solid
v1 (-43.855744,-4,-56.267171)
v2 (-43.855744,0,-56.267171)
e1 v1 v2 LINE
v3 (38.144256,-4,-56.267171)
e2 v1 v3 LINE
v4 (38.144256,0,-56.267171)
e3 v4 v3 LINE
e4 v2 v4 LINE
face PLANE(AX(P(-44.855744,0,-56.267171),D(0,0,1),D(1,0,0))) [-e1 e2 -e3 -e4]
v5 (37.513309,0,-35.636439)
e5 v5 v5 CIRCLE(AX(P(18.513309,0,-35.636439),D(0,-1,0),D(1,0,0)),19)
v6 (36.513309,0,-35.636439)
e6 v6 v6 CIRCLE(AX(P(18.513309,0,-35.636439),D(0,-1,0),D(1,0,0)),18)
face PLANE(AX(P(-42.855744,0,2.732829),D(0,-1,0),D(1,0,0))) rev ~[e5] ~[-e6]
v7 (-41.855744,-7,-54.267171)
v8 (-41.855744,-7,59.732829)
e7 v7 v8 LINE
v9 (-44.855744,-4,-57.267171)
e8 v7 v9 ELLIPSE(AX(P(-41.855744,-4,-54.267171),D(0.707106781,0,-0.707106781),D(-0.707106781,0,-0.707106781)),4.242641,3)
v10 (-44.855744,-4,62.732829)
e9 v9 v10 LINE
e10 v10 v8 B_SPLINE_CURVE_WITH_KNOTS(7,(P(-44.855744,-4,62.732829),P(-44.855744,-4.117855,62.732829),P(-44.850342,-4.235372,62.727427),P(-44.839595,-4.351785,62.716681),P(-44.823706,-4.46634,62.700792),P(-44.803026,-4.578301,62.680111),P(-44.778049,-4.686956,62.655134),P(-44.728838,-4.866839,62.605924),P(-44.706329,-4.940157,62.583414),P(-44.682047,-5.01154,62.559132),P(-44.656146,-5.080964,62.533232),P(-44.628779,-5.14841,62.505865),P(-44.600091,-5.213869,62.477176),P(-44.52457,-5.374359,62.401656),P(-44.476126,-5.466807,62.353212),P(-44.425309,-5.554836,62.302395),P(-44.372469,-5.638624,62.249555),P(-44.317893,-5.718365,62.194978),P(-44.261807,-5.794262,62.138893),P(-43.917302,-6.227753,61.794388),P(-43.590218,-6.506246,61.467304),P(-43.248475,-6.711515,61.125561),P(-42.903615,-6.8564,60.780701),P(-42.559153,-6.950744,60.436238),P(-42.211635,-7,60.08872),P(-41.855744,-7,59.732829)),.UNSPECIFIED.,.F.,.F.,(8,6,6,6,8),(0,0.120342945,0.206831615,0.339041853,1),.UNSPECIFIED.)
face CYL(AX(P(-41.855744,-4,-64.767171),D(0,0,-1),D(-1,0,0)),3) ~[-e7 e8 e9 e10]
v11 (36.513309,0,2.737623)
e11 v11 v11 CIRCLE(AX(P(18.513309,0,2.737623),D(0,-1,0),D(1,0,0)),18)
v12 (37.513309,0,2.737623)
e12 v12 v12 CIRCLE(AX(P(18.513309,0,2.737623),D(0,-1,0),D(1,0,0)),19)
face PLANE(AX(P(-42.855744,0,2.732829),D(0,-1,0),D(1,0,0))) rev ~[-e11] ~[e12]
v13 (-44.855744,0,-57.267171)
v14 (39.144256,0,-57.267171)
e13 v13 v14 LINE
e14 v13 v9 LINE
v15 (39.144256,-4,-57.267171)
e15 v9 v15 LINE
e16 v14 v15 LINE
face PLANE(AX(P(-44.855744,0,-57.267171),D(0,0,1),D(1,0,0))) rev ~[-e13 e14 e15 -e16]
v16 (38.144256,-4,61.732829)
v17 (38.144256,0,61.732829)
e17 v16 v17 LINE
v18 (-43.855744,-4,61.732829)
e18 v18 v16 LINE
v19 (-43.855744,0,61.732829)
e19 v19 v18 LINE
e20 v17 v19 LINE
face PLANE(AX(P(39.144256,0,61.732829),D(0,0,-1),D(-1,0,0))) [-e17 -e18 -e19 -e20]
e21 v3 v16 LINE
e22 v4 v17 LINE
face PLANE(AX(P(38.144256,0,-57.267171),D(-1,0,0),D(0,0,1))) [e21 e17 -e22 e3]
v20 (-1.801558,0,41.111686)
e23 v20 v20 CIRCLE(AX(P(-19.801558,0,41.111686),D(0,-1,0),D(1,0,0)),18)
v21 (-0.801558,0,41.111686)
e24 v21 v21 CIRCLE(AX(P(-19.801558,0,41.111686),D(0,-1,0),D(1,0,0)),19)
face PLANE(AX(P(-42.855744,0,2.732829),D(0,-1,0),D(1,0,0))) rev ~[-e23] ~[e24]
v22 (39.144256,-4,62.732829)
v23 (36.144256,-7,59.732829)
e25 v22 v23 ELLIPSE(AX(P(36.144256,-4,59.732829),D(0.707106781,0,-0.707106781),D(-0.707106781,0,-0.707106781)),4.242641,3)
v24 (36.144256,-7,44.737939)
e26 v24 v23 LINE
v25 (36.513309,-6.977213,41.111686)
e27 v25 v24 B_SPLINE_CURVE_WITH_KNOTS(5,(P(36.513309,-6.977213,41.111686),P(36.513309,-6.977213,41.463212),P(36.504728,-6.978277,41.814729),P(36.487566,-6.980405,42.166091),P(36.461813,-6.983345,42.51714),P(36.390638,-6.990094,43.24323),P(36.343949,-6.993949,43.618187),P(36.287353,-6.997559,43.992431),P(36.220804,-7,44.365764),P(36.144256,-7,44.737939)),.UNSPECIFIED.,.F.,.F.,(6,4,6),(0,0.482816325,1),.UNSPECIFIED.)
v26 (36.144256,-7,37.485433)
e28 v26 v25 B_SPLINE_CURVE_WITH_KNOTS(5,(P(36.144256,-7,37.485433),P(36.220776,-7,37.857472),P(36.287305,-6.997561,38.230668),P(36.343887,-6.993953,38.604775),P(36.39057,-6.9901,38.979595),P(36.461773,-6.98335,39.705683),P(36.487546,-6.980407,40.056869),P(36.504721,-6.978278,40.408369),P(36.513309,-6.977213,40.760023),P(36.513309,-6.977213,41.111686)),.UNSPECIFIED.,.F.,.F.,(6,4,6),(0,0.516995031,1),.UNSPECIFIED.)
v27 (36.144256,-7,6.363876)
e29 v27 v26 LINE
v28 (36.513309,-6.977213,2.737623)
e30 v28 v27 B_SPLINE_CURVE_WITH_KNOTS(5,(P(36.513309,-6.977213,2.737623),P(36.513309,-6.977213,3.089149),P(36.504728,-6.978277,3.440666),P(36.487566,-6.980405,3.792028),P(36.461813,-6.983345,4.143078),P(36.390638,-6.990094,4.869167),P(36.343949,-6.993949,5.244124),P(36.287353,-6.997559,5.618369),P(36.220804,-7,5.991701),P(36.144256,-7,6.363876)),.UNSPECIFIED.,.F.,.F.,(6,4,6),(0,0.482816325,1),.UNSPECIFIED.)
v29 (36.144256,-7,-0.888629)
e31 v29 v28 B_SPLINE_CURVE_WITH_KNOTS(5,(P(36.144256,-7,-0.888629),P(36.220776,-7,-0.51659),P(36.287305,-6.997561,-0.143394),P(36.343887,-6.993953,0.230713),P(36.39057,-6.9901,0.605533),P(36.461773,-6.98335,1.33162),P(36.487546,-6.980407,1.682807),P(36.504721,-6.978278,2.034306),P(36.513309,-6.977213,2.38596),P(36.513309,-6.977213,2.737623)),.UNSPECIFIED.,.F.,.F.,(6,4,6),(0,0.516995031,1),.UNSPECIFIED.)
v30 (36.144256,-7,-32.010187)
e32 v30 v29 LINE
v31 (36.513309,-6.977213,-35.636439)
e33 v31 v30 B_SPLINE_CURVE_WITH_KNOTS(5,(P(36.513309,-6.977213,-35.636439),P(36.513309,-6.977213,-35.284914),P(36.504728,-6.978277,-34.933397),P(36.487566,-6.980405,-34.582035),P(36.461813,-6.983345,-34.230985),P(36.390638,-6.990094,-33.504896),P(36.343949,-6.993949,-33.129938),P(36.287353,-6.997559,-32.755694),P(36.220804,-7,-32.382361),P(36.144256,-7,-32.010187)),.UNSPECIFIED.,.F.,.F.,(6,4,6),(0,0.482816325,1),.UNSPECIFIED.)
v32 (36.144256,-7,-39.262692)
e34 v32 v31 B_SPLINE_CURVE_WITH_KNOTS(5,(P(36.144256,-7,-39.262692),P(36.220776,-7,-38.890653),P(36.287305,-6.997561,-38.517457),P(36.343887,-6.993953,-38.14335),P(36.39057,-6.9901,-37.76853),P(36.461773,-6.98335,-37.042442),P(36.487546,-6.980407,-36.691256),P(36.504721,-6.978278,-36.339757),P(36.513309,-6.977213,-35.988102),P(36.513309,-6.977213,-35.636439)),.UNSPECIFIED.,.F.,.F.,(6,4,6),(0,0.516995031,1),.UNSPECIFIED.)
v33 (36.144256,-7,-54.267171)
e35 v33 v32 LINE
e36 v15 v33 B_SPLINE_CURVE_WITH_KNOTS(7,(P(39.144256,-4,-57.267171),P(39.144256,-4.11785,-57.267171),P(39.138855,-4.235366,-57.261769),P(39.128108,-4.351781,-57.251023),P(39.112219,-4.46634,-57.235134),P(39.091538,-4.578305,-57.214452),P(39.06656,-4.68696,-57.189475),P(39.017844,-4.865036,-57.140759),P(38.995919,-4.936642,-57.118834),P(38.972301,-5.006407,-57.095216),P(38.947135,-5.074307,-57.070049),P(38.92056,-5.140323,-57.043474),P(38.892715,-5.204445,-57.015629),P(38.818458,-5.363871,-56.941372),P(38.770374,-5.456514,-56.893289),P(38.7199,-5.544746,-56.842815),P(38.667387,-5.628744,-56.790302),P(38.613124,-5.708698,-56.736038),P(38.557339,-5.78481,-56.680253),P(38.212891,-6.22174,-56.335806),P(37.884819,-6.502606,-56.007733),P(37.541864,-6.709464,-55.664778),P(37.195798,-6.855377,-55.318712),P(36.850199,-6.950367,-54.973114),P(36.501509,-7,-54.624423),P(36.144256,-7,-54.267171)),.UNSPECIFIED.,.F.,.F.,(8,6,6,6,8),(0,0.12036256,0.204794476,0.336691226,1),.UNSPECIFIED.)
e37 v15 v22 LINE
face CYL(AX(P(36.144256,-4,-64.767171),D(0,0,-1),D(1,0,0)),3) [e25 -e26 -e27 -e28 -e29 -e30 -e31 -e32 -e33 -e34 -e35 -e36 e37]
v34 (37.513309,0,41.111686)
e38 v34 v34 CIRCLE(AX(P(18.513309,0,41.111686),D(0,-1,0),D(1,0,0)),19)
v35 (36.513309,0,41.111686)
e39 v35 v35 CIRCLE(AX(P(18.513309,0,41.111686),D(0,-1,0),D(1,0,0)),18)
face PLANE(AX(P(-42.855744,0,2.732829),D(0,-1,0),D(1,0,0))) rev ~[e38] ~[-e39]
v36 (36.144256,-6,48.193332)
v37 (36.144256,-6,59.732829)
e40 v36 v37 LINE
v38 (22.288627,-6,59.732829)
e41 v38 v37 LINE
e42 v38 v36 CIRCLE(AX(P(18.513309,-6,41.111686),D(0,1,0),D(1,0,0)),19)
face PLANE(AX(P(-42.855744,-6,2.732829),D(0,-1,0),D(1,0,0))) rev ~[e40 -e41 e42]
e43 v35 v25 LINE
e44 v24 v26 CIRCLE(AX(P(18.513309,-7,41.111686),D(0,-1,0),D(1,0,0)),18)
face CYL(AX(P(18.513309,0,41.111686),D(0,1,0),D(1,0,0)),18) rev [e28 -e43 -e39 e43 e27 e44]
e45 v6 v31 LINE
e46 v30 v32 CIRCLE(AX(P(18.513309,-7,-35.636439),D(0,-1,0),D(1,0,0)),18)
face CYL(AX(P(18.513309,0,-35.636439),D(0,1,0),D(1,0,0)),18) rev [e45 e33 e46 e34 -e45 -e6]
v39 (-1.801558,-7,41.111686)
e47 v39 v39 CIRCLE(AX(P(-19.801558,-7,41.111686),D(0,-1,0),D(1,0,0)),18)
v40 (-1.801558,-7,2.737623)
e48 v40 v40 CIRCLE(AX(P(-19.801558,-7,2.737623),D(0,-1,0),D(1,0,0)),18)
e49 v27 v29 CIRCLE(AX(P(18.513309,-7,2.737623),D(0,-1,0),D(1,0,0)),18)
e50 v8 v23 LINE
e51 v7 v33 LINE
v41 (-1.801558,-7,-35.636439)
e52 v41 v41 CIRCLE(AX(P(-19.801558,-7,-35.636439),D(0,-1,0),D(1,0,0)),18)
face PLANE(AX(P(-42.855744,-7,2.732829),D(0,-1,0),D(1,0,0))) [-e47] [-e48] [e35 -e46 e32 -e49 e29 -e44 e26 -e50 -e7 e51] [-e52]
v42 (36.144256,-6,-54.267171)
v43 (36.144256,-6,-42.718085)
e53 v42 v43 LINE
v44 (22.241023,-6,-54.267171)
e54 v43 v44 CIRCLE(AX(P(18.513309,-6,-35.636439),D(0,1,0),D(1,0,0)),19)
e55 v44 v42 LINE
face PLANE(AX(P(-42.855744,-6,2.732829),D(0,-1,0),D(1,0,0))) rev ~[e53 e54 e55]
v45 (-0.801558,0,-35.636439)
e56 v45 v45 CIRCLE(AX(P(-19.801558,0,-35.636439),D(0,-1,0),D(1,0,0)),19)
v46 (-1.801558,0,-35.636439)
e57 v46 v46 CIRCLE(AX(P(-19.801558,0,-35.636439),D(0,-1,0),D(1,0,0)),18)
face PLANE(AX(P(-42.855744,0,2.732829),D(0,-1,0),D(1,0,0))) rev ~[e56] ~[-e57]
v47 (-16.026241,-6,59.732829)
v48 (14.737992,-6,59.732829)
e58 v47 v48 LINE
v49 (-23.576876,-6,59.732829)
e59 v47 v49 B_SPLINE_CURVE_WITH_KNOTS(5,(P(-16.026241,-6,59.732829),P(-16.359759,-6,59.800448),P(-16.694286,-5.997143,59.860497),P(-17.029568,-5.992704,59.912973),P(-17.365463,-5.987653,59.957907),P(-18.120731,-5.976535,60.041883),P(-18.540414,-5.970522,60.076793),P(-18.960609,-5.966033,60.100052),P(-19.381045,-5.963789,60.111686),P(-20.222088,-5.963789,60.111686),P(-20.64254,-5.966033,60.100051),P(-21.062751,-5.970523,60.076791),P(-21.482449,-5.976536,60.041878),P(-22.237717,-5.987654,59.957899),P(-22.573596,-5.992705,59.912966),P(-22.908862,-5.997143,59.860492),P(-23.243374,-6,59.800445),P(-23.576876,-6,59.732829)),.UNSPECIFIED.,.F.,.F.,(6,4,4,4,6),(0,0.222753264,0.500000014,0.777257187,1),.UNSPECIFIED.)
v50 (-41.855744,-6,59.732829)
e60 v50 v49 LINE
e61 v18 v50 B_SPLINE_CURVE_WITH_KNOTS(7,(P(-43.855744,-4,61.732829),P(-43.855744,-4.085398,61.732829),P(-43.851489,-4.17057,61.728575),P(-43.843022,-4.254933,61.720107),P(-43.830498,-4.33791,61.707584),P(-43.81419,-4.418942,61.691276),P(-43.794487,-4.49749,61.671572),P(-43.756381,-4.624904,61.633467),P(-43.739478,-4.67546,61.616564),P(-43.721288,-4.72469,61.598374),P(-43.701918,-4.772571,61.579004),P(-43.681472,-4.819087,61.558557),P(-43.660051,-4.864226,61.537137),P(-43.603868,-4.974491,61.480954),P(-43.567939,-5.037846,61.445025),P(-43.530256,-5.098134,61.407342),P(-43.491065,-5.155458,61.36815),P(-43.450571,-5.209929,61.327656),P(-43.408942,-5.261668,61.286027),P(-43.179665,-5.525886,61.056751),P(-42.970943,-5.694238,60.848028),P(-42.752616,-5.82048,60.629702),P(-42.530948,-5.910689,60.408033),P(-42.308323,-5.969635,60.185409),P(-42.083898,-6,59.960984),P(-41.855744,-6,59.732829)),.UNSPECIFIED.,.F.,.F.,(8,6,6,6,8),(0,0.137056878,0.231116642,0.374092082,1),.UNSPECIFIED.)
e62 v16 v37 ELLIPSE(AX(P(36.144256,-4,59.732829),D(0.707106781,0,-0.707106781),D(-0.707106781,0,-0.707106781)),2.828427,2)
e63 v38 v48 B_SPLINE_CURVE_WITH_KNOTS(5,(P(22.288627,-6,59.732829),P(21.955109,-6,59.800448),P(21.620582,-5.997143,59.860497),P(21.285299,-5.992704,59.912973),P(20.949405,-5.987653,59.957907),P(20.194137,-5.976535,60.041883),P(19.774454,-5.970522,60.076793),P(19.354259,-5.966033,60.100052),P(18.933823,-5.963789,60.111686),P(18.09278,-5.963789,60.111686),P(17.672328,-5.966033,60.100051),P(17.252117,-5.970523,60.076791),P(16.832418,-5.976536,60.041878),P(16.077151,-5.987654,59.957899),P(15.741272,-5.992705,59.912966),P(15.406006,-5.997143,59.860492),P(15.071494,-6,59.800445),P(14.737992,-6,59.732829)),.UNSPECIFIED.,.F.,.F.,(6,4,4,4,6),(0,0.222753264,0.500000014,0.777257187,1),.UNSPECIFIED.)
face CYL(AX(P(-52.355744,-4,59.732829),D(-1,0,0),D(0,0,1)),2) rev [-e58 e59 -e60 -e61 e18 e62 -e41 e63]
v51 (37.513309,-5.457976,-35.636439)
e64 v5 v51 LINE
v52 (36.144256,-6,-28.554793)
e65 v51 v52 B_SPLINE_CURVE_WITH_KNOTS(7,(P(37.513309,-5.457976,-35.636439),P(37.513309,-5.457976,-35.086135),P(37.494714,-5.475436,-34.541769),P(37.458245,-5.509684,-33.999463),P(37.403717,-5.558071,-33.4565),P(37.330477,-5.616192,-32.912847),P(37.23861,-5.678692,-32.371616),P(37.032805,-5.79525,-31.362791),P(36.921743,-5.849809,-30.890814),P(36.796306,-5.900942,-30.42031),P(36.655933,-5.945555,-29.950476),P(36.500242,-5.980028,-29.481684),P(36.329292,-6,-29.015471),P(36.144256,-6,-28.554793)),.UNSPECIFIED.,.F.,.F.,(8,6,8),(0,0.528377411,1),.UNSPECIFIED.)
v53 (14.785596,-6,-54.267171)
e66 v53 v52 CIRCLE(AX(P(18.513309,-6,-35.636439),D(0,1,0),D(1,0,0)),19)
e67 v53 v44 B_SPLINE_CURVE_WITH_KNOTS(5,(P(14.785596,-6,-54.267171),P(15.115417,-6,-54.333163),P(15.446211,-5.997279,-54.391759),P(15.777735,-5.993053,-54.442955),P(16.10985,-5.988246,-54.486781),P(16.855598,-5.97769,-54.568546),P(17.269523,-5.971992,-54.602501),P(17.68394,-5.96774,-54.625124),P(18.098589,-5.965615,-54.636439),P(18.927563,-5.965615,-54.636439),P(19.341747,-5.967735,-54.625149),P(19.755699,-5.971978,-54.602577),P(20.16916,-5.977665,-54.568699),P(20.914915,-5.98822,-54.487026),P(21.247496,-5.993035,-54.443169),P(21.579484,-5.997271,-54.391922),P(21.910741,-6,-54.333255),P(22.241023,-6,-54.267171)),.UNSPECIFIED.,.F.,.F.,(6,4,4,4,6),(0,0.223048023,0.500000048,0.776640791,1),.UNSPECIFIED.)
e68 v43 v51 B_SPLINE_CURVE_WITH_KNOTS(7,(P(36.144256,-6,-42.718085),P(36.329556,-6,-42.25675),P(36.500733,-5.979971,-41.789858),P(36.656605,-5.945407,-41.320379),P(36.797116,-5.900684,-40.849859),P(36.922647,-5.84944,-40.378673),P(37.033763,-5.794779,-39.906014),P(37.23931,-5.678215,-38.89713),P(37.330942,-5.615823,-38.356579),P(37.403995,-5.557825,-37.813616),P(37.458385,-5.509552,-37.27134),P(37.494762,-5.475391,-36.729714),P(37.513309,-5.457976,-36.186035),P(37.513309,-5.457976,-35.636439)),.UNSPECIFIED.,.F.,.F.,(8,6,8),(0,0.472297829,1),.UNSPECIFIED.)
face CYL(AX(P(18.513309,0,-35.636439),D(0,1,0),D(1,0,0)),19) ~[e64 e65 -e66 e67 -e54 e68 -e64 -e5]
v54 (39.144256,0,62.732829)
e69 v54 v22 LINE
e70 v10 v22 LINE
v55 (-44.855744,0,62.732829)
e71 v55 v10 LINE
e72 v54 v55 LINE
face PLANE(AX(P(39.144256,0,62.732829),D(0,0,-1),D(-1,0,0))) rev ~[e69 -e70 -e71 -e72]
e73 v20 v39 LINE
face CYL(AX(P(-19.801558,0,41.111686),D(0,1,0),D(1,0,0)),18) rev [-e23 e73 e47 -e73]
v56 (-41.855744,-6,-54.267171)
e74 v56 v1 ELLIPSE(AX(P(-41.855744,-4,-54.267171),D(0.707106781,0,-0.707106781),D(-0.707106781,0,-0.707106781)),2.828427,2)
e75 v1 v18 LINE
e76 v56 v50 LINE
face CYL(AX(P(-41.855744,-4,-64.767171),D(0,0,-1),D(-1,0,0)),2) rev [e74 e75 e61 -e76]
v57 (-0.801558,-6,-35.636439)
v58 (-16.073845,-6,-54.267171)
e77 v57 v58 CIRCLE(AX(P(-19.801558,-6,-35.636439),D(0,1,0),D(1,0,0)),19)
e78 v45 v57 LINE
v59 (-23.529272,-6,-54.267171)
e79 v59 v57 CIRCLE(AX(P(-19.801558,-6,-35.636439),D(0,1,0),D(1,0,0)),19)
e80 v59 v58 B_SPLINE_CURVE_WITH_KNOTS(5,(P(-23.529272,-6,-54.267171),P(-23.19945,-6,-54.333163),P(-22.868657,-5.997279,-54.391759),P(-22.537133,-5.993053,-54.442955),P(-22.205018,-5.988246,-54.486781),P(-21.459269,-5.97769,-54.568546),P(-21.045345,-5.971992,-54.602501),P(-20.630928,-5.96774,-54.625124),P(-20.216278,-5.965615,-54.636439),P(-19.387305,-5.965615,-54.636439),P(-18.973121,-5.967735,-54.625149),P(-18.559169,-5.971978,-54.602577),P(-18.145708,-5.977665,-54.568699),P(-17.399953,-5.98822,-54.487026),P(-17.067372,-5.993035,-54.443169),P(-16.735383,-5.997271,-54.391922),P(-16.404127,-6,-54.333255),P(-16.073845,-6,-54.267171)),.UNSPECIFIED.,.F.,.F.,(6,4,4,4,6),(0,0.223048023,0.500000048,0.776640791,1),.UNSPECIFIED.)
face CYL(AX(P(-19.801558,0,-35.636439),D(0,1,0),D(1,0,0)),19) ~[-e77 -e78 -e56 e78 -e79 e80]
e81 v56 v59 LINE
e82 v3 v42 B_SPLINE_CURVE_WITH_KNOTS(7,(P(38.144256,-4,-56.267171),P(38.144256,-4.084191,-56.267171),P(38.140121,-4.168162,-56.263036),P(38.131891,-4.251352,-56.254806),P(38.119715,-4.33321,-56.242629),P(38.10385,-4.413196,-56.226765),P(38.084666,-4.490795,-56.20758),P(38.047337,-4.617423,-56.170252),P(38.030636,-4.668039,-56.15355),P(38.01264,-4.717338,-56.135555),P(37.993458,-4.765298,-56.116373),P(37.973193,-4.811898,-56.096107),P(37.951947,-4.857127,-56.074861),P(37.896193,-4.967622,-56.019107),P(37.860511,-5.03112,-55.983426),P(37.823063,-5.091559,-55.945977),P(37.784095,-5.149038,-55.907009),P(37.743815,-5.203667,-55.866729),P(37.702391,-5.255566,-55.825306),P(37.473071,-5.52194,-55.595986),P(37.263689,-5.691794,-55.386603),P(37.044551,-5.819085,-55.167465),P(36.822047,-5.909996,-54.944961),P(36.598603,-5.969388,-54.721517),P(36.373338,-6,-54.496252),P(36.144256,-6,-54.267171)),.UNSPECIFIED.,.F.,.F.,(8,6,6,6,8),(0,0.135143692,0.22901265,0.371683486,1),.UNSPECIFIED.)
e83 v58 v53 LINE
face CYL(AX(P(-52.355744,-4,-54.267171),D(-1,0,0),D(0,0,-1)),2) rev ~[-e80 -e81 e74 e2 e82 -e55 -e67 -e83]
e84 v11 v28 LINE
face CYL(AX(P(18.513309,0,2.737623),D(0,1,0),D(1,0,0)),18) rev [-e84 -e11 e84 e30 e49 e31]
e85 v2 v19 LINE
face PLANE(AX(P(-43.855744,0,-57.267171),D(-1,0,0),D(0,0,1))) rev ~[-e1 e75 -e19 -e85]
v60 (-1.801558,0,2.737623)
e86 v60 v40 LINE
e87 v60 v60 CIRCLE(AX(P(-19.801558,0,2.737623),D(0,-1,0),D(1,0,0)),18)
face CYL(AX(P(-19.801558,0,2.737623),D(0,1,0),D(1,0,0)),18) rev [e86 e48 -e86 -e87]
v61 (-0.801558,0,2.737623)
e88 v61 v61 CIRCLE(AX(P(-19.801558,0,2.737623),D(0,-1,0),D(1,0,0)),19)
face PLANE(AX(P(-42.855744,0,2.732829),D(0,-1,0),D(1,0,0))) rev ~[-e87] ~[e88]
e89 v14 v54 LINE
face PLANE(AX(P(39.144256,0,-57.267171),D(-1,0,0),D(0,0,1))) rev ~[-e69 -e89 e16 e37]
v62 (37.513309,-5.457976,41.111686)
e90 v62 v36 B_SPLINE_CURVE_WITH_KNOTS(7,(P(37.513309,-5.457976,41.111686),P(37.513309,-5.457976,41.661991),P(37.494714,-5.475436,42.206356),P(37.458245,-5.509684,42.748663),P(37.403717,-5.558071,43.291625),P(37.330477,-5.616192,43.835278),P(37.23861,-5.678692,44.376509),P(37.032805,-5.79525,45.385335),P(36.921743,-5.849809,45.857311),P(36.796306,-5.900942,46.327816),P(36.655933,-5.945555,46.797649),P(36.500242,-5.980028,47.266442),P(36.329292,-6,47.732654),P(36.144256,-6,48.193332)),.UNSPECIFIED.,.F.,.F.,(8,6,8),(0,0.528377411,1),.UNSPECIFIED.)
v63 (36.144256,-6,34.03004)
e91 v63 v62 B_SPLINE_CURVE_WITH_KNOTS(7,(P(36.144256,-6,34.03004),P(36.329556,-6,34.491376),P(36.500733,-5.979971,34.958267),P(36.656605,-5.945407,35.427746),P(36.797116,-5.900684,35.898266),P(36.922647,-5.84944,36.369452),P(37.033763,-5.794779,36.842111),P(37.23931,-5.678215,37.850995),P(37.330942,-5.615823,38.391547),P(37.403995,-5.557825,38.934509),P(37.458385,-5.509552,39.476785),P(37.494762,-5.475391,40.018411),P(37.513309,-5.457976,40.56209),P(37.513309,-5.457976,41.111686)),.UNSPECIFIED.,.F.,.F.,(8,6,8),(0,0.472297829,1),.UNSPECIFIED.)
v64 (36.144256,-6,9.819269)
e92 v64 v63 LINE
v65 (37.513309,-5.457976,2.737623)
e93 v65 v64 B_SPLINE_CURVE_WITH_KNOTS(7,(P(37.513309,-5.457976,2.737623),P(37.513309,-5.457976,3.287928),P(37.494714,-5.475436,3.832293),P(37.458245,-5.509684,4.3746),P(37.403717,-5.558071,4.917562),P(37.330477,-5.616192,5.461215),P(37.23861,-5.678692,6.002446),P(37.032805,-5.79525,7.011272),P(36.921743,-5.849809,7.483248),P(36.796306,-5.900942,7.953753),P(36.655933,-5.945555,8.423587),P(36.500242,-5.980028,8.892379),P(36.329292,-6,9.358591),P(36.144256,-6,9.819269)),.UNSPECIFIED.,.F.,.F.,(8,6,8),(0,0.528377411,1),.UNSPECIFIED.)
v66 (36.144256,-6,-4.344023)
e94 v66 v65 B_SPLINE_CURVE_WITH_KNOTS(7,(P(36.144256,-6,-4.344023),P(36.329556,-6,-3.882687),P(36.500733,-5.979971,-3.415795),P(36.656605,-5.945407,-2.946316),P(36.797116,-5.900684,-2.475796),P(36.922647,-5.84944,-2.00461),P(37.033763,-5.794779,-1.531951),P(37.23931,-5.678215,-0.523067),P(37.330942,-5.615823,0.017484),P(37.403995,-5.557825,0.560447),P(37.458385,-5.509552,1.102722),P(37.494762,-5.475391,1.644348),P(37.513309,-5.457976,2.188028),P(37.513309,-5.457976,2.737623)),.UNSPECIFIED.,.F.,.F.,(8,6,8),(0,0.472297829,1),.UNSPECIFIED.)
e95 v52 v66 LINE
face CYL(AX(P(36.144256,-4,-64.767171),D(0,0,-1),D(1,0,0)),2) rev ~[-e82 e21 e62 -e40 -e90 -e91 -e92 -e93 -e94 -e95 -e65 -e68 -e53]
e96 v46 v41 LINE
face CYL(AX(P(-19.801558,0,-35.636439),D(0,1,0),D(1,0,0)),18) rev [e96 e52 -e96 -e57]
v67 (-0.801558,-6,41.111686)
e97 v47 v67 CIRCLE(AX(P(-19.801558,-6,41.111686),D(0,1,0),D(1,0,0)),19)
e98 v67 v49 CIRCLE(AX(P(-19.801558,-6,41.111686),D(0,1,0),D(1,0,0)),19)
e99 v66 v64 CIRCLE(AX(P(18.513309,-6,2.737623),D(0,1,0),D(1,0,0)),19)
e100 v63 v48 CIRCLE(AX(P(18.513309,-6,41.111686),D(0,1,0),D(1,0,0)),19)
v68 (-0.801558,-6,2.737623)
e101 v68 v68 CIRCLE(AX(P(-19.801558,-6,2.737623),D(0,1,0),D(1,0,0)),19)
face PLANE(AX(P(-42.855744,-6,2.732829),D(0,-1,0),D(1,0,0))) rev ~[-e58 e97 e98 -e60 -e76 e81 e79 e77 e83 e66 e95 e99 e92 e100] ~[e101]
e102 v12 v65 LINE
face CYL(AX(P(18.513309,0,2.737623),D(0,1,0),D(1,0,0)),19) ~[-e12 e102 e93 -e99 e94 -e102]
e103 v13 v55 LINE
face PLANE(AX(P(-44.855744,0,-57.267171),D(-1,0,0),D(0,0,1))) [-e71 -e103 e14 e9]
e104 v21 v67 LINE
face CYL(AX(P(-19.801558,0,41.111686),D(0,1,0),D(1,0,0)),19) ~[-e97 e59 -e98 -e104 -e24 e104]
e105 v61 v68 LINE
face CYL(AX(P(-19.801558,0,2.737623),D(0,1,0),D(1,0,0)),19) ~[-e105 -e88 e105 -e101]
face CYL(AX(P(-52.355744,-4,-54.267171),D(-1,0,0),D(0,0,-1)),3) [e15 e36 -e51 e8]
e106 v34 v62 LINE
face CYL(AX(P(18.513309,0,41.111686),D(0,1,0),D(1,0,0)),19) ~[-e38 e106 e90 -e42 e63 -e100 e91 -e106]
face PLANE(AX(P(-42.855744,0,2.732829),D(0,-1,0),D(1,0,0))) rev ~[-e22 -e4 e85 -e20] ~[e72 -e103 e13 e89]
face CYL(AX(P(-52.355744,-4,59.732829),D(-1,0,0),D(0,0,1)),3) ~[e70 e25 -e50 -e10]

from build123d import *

# Parameters (mm, degrees)
F0_W        = 4
F0_H        = 120
F0_R        = 18
F1_DEPTH    = 7
F2_T1_DEPTH = 135
F2_T3_DEPTH = 99
F3_T        = -1


# Not quite as in the source:
# - a fillet or chamfer that OpenCascade refuses, or shapes differently, is made with other operations: its cross-section is extruded or revolved along the edge and cut away or added


with BuildPart() as f1:
    # F0 (on Front) → F1 (new body)
    with BuildSketch(Plane.XZ):
        with Locations((-42.8557436466, 2.7328292441)):
            Rectangle(F0_W, F0_H)
        Polygon((-0.6441245232, 2.7376232945), (-0.6441245232, 62.7328292441), (-40.8557436466, 62.7328292441), (-40.8557436466, -57.2671707559), (-0.6441245232, -57.2671707559), align=None)
        with Locations((-19.8015584055, -35.636439333)):
            Circle(F0_R, mode=Mode.SUBTRACT)
        with Locations((-19.8015584055, 2.7376232945)):
            Circle(F0_R, mode=Mode.SUBTRACT)
        with Locations((-19.8015584055, 41.1116859221)):
            Circle(F0_R, mode=Mode.SUBTRACT)
        Polygon((39.1442563534, -57.2671707559), (39.1442563534, 62.7328292441), (-0.6441245232, 62.7328292441), (-0.6441245232, 2.7376232945), (-0.6441245232, -57.2671707559), align=None)
        with Locations((18.5133093592, -35.636439333)):
            Circle(F0_R, mode=Mode.SUBTRACT)
        with Locations((18.5133093592, 2.7376232945)):
            Circle(F0_R, mode=Mode.SUBTRACT)
        with Locations((18.5133093592, 41.1116859221)):
            Circle(F0_R, mode=Mode.SUBTRACT)
    extrude(amount=F1_DEPTH)

    # F2: fillet of radius 3 on 4 edges, made by hand

    # F2_s2 → F2_t1 (cut)
    with BuildSketch(Plane.XY.offset(-64.7671707559)):
        with BuildLine():
            ThreePointArc((-44.8557436466, -4), (-43.9770639902, -6.1213203436), (-41.8557436466, -7))
            Line((-41.8557436466, -7), (-44.8557436466, -7))
            Line((-44.8557436466, -7), (-44.8557436466, -4))
        make_face()
        with BuildLine():
            ThreePointArc((39.1442563534, -4), (38.2655766969, -6.1213203436), (36.1442563534, -7))
            Line((36.1442563534, -7), (39.1442563534, -7))
            Line((39.1442563534, -7), (39.1442563534, -4))
        make_face()
    extrude(amount=F2_T1_DEPTH, mode=Mode.SUBTRACT)

    # F2_s4 → F2_t3 (cut)
    with BuildSketch(Plane.YZ.offset(-52.3557436466)):
        with BuildLine():
            ThreePointArc((-4, -57.2671707559), (-6.1213203436, -56.3884910995), (-7, -54.2671707559))
            Line((-7, -54.2671707559), (-7, -57.2671707559))
            Line((-7, -57.2671707559), (-4, -57.2671707559))
        make_face()
        with BuildLine():
            ThreePointArc((-4, 62.7328292441), (-6.1213203436, 61.8541495876), (-7, 59.7328292441))
            Line((-7, 59.7328292441), (-7, 62.7328292441))
            Line((-7, 62.7328292441), (-4, 62.7328292441))
        make_face()
    extrude(amount=F2_T3_DEPTH, mode=Mode.SUBTRACT)

    # F3
    f3_openings = [f1.faces().sort_by_distance(p)[0] for p in [
        (-43.390957, 0, 2.732829),
    ]]
    offset(amount=F3_T, openings=f3_openings)


solid = f1.part
